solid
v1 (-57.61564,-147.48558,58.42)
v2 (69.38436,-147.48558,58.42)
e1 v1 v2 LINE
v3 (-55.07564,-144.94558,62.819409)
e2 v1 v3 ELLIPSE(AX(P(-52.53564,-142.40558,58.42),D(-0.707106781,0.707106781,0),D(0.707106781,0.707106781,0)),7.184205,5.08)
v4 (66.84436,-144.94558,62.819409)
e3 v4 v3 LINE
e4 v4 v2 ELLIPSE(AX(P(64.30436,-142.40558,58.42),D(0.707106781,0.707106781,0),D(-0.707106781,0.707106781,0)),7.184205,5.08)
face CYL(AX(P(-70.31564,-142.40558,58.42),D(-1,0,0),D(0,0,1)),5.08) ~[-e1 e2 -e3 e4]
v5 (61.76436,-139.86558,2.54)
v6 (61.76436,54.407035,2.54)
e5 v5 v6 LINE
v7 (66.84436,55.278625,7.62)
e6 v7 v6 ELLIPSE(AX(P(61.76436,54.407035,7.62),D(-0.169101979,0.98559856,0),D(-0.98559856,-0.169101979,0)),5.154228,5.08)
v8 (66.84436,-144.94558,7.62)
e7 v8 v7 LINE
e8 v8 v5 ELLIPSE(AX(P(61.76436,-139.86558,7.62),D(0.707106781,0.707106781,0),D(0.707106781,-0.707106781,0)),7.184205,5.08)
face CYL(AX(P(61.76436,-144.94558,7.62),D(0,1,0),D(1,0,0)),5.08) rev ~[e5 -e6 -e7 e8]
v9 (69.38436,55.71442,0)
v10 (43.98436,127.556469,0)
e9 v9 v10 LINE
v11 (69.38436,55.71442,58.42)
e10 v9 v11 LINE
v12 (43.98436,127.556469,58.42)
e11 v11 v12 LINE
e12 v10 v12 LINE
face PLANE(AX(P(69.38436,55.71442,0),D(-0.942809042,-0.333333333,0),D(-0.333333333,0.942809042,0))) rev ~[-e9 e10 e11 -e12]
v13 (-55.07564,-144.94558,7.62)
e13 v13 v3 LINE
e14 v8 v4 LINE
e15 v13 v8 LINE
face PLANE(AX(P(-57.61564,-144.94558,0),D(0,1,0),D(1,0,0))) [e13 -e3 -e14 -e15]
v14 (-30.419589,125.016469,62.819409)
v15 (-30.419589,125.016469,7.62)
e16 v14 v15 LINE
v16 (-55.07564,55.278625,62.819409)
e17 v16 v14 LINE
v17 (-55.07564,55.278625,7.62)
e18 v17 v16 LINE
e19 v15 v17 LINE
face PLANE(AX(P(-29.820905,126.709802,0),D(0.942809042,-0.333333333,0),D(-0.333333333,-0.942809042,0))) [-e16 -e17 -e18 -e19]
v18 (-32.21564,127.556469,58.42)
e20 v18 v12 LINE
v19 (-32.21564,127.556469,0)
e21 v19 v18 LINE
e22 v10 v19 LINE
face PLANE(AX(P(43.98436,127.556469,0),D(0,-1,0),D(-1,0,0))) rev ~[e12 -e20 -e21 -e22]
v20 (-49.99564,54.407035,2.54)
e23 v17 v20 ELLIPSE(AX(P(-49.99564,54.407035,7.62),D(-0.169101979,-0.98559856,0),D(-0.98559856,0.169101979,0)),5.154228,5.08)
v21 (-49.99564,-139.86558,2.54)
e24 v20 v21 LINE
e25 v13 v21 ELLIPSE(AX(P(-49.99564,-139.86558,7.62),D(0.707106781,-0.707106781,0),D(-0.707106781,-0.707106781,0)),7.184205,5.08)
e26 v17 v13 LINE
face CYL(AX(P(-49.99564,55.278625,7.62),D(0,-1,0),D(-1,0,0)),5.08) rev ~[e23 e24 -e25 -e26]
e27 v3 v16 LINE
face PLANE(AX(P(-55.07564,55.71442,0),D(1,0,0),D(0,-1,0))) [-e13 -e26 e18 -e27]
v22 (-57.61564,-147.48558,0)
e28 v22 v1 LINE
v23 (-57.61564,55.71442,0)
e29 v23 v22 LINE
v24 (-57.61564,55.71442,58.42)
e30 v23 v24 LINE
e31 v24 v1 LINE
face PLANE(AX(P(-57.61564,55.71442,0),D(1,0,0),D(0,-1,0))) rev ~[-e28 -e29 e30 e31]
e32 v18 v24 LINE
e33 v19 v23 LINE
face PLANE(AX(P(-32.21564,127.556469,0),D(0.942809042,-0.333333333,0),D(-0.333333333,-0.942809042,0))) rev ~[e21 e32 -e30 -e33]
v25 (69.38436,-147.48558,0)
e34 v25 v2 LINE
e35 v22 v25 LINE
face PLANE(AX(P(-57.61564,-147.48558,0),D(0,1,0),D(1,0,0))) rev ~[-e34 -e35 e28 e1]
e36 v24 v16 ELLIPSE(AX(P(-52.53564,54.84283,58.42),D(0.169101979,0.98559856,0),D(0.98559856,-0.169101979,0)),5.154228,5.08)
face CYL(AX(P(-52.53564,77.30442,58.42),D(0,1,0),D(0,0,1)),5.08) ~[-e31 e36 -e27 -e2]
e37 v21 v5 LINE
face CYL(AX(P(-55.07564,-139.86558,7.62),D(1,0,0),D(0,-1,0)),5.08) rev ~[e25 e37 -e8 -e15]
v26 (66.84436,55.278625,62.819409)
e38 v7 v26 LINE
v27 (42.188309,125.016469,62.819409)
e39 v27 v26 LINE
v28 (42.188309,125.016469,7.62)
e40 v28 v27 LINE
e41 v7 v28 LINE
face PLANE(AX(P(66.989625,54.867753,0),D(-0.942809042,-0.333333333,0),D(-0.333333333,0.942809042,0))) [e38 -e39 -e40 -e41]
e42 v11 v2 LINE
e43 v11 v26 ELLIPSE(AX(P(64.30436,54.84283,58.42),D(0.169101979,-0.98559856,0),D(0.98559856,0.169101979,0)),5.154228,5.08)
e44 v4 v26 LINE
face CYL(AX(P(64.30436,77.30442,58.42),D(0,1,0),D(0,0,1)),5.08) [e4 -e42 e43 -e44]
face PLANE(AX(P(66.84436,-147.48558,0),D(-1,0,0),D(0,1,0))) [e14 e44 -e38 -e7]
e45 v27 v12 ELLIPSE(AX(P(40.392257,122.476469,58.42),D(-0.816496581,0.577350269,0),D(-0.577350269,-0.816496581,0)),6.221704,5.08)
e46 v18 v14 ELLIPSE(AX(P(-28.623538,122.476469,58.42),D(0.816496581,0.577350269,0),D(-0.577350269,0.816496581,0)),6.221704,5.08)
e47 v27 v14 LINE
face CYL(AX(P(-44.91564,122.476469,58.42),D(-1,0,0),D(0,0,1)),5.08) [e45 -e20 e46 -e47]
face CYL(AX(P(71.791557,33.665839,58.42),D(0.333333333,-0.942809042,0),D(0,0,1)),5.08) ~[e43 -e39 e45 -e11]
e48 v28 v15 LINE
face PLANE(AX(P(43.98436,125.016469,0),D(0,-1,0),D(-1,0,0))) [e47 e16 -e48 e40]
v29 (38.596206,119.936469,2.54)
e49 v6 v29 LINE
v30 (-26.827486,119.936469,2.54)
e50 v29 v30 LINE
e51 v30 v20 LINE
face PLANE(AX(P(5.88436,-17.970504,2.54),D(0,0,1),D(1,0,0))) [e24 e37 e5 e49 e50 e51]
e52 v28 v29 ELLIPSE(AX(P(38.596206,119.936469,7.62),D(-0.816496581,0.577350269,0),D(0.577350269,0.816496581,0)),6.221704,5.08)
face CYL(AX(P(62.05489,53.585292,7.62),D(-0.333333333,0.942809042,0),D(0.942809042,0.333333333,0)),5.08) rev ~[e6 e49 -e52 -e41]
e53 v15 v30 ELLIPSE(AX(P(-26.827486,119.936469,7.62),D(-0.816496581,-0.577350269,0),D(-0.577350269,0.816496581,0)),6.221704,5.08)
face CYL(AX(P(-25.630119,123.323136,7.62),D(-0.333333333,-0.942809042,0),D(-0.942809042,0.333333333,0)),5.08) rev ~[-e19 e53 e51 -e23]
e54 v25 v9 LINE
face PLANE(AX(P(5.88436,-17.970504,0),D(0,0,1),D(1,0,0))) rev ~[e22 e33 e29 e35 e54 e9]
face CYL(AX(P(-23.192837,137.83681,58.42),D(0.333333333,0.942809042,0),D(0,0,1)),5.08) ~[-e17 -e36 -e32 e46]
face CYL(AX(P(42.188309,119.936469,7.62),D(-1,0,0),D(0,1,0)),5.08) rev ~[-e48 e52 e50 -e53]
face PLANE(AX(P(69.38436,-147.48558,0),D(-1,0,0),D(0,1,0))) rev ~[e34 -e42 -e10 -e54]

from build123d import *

# Parameters (mm, degrees)
F1_DEPTH    = 63.5
F2_T        = -2.54
F3_R        = 5.08
F4_T1_DEPTH = 110.49
F4_T3_DEPTH = 101.6
F4_T5_DEPTH = 110.49
F4_T7_DEPTH = 237.49
F4_T9_DEPTH = 152.4


# Not quite as in the source:
# - a fillet or chamfer that OpenCascade refuses, or shapes differently, is made with other operations: its cross-section is extruded or revolved along the edge and cut away or added


with BuildPart() as f1:
    # F0 (on Top) → F1 (new body)
    with BuildSketch(Plane.XY):
        Polygon((-32.2156401169, 127.5564689514), (-57.6156401169, 55.7144199828), (-57.6156401169, -147.4855800172), (69.3843598831, -147.4855800172), (69.3843598831, 55.7144199828), (43.9843598831, 127.5564689514), align=None)
    extrude(amount=F1_DEPTH)

    # F2
    f2_openings = [f1.faces().sort_by_distance(p)[0] for p in [
        (5.88436, -16.224771, 63.5),
    ]]
    offset(amount=F2_T, openings=f2_openings)

    # F3
    f3_edges = [f1.edges().sort_by_distance(p)[0] for p in [
        (54.516334, 90.147547, 2.54),
        (5.88436, 125.016469, 2.54),
        (-42.747615, 90.147547, 2.54),
        (-55.07564, -44.833478, 2.54),
        (5.88436, -144.94558, 2.54),
        (66.84436, -44.833478, 2.54),
    ]]
    fillet(f3_edges, radius=F3_R)

    # F4: fillet of radius 5.08 on 6 edges, made by hand

    # F4_s2 → F4_t1 (cut)
    with BuildSketch(Plane(origin=(40.7409485113, 115.2328038573, 0), x_dir=(0, 0, 1), z_dir=(-0.3333333333, -0.9428090416, 0))):
        with BuildLine():
            ThreePointArc((63.5, 67.8120197664), (62.0121024484, 71.4041222148), (58.42, 72.8920197664))
            Line((58.42, 72.8920197664), (63.5, 72.8920197664))
            Line((63.5, 72.8920197664), (63.5, 67.8120197664))
        make_face()
    extrude(amount=F4_T1_DEPTH, mode=Mode.SUBTRACT)

    # F4_s4 → F4_t3 (cut)
    with BuildSketch(Plane.YZ.offset(-44.9156401169)):
        with BuildLine():
            ThreePointArc((122.4764689514, 63.5), (126.0685713998, 62.0121024484), (127.5564689514, 58.42))
            Line((127.5564689514, 58.42), (127.5564689514, 63.5))
            Line((127.5564689514, 63.5), (122.4764689514, 63.5))
        make_face()
    extrude(amount=F4_T3_DEPTH, mode=Mode.SUBTRACT)

    # F4_s6 → F4_t5 (cut)
    with BuildSketch(Plane(origin=(-2.6033129818, 7.3632810518, 0), x_dir=(0, 0, 1), z_dir=(-0.3333333333, 0.9428090416, 0))):
        with BuildLine():
            ThreePointArc((63.5, 78.9076751698), (62.0121024484, 82.4997776182), (58.42, 83.9876751698))
            Line((58.42, 83.9876751698), (63.5, 83.9876751698))
            Line((63.5, 83.9876751698), (63.5, 78.9076751698))
        make_face()
    extrude(amount=F4_T5_DEPTH, mode=Mode.SUBTRACT)

    # F4_s8 → F4_t7 (cut)
    with BuildSketch(Plane.XZ.offset(-77.3044199828)):
        with BuildLine():
            ThreePointArc((-52.5356401169, 63.5), (-56.1277425653, 62.0121024484), (-57.6156401169, 58.42))
            Line((-57.6156401169, 58.42), (-57.6156401169, 63.5))
            Line((-57.6156401169, 63.5), (-52.5356401169, 63.5))
        make_face()
        with BuildLine():
            ThreePointArc((64.3043598831, 63.5), (67.8964623315, 62.0121024484), (69.3843598831, 58.42))
            Line((69.3843598831, 58.42), (69.3843598831, 63.5))
            Line((69.3843598831, 63.5), (64.3043598831, 63.5))
        make_face()
    extrude(amount=F4_T7_DEPTH, mode=Mode.SUBTRACT)

    # F4_s10 → F4_t9 (cut)
    with BuildSketch(Plane.YZ.offset(-70.3156401169)):
        with BuildLine():
            ThreePointArc((-142.4055800172, 63.5), (-145.9976824656, 62.0121024484), (-147.4855800172, 58.42))
            Line((-147.4855800172, 58.42), (-147.4855800172, 63.5))
            Line((-147.4855800172, 63.5), (-142.4055800172, 63.5))
        make_face()
    extrude(amount=F4_T9_DEPTH, mode=Mode.SUBTRACT)


solid = f1.part
